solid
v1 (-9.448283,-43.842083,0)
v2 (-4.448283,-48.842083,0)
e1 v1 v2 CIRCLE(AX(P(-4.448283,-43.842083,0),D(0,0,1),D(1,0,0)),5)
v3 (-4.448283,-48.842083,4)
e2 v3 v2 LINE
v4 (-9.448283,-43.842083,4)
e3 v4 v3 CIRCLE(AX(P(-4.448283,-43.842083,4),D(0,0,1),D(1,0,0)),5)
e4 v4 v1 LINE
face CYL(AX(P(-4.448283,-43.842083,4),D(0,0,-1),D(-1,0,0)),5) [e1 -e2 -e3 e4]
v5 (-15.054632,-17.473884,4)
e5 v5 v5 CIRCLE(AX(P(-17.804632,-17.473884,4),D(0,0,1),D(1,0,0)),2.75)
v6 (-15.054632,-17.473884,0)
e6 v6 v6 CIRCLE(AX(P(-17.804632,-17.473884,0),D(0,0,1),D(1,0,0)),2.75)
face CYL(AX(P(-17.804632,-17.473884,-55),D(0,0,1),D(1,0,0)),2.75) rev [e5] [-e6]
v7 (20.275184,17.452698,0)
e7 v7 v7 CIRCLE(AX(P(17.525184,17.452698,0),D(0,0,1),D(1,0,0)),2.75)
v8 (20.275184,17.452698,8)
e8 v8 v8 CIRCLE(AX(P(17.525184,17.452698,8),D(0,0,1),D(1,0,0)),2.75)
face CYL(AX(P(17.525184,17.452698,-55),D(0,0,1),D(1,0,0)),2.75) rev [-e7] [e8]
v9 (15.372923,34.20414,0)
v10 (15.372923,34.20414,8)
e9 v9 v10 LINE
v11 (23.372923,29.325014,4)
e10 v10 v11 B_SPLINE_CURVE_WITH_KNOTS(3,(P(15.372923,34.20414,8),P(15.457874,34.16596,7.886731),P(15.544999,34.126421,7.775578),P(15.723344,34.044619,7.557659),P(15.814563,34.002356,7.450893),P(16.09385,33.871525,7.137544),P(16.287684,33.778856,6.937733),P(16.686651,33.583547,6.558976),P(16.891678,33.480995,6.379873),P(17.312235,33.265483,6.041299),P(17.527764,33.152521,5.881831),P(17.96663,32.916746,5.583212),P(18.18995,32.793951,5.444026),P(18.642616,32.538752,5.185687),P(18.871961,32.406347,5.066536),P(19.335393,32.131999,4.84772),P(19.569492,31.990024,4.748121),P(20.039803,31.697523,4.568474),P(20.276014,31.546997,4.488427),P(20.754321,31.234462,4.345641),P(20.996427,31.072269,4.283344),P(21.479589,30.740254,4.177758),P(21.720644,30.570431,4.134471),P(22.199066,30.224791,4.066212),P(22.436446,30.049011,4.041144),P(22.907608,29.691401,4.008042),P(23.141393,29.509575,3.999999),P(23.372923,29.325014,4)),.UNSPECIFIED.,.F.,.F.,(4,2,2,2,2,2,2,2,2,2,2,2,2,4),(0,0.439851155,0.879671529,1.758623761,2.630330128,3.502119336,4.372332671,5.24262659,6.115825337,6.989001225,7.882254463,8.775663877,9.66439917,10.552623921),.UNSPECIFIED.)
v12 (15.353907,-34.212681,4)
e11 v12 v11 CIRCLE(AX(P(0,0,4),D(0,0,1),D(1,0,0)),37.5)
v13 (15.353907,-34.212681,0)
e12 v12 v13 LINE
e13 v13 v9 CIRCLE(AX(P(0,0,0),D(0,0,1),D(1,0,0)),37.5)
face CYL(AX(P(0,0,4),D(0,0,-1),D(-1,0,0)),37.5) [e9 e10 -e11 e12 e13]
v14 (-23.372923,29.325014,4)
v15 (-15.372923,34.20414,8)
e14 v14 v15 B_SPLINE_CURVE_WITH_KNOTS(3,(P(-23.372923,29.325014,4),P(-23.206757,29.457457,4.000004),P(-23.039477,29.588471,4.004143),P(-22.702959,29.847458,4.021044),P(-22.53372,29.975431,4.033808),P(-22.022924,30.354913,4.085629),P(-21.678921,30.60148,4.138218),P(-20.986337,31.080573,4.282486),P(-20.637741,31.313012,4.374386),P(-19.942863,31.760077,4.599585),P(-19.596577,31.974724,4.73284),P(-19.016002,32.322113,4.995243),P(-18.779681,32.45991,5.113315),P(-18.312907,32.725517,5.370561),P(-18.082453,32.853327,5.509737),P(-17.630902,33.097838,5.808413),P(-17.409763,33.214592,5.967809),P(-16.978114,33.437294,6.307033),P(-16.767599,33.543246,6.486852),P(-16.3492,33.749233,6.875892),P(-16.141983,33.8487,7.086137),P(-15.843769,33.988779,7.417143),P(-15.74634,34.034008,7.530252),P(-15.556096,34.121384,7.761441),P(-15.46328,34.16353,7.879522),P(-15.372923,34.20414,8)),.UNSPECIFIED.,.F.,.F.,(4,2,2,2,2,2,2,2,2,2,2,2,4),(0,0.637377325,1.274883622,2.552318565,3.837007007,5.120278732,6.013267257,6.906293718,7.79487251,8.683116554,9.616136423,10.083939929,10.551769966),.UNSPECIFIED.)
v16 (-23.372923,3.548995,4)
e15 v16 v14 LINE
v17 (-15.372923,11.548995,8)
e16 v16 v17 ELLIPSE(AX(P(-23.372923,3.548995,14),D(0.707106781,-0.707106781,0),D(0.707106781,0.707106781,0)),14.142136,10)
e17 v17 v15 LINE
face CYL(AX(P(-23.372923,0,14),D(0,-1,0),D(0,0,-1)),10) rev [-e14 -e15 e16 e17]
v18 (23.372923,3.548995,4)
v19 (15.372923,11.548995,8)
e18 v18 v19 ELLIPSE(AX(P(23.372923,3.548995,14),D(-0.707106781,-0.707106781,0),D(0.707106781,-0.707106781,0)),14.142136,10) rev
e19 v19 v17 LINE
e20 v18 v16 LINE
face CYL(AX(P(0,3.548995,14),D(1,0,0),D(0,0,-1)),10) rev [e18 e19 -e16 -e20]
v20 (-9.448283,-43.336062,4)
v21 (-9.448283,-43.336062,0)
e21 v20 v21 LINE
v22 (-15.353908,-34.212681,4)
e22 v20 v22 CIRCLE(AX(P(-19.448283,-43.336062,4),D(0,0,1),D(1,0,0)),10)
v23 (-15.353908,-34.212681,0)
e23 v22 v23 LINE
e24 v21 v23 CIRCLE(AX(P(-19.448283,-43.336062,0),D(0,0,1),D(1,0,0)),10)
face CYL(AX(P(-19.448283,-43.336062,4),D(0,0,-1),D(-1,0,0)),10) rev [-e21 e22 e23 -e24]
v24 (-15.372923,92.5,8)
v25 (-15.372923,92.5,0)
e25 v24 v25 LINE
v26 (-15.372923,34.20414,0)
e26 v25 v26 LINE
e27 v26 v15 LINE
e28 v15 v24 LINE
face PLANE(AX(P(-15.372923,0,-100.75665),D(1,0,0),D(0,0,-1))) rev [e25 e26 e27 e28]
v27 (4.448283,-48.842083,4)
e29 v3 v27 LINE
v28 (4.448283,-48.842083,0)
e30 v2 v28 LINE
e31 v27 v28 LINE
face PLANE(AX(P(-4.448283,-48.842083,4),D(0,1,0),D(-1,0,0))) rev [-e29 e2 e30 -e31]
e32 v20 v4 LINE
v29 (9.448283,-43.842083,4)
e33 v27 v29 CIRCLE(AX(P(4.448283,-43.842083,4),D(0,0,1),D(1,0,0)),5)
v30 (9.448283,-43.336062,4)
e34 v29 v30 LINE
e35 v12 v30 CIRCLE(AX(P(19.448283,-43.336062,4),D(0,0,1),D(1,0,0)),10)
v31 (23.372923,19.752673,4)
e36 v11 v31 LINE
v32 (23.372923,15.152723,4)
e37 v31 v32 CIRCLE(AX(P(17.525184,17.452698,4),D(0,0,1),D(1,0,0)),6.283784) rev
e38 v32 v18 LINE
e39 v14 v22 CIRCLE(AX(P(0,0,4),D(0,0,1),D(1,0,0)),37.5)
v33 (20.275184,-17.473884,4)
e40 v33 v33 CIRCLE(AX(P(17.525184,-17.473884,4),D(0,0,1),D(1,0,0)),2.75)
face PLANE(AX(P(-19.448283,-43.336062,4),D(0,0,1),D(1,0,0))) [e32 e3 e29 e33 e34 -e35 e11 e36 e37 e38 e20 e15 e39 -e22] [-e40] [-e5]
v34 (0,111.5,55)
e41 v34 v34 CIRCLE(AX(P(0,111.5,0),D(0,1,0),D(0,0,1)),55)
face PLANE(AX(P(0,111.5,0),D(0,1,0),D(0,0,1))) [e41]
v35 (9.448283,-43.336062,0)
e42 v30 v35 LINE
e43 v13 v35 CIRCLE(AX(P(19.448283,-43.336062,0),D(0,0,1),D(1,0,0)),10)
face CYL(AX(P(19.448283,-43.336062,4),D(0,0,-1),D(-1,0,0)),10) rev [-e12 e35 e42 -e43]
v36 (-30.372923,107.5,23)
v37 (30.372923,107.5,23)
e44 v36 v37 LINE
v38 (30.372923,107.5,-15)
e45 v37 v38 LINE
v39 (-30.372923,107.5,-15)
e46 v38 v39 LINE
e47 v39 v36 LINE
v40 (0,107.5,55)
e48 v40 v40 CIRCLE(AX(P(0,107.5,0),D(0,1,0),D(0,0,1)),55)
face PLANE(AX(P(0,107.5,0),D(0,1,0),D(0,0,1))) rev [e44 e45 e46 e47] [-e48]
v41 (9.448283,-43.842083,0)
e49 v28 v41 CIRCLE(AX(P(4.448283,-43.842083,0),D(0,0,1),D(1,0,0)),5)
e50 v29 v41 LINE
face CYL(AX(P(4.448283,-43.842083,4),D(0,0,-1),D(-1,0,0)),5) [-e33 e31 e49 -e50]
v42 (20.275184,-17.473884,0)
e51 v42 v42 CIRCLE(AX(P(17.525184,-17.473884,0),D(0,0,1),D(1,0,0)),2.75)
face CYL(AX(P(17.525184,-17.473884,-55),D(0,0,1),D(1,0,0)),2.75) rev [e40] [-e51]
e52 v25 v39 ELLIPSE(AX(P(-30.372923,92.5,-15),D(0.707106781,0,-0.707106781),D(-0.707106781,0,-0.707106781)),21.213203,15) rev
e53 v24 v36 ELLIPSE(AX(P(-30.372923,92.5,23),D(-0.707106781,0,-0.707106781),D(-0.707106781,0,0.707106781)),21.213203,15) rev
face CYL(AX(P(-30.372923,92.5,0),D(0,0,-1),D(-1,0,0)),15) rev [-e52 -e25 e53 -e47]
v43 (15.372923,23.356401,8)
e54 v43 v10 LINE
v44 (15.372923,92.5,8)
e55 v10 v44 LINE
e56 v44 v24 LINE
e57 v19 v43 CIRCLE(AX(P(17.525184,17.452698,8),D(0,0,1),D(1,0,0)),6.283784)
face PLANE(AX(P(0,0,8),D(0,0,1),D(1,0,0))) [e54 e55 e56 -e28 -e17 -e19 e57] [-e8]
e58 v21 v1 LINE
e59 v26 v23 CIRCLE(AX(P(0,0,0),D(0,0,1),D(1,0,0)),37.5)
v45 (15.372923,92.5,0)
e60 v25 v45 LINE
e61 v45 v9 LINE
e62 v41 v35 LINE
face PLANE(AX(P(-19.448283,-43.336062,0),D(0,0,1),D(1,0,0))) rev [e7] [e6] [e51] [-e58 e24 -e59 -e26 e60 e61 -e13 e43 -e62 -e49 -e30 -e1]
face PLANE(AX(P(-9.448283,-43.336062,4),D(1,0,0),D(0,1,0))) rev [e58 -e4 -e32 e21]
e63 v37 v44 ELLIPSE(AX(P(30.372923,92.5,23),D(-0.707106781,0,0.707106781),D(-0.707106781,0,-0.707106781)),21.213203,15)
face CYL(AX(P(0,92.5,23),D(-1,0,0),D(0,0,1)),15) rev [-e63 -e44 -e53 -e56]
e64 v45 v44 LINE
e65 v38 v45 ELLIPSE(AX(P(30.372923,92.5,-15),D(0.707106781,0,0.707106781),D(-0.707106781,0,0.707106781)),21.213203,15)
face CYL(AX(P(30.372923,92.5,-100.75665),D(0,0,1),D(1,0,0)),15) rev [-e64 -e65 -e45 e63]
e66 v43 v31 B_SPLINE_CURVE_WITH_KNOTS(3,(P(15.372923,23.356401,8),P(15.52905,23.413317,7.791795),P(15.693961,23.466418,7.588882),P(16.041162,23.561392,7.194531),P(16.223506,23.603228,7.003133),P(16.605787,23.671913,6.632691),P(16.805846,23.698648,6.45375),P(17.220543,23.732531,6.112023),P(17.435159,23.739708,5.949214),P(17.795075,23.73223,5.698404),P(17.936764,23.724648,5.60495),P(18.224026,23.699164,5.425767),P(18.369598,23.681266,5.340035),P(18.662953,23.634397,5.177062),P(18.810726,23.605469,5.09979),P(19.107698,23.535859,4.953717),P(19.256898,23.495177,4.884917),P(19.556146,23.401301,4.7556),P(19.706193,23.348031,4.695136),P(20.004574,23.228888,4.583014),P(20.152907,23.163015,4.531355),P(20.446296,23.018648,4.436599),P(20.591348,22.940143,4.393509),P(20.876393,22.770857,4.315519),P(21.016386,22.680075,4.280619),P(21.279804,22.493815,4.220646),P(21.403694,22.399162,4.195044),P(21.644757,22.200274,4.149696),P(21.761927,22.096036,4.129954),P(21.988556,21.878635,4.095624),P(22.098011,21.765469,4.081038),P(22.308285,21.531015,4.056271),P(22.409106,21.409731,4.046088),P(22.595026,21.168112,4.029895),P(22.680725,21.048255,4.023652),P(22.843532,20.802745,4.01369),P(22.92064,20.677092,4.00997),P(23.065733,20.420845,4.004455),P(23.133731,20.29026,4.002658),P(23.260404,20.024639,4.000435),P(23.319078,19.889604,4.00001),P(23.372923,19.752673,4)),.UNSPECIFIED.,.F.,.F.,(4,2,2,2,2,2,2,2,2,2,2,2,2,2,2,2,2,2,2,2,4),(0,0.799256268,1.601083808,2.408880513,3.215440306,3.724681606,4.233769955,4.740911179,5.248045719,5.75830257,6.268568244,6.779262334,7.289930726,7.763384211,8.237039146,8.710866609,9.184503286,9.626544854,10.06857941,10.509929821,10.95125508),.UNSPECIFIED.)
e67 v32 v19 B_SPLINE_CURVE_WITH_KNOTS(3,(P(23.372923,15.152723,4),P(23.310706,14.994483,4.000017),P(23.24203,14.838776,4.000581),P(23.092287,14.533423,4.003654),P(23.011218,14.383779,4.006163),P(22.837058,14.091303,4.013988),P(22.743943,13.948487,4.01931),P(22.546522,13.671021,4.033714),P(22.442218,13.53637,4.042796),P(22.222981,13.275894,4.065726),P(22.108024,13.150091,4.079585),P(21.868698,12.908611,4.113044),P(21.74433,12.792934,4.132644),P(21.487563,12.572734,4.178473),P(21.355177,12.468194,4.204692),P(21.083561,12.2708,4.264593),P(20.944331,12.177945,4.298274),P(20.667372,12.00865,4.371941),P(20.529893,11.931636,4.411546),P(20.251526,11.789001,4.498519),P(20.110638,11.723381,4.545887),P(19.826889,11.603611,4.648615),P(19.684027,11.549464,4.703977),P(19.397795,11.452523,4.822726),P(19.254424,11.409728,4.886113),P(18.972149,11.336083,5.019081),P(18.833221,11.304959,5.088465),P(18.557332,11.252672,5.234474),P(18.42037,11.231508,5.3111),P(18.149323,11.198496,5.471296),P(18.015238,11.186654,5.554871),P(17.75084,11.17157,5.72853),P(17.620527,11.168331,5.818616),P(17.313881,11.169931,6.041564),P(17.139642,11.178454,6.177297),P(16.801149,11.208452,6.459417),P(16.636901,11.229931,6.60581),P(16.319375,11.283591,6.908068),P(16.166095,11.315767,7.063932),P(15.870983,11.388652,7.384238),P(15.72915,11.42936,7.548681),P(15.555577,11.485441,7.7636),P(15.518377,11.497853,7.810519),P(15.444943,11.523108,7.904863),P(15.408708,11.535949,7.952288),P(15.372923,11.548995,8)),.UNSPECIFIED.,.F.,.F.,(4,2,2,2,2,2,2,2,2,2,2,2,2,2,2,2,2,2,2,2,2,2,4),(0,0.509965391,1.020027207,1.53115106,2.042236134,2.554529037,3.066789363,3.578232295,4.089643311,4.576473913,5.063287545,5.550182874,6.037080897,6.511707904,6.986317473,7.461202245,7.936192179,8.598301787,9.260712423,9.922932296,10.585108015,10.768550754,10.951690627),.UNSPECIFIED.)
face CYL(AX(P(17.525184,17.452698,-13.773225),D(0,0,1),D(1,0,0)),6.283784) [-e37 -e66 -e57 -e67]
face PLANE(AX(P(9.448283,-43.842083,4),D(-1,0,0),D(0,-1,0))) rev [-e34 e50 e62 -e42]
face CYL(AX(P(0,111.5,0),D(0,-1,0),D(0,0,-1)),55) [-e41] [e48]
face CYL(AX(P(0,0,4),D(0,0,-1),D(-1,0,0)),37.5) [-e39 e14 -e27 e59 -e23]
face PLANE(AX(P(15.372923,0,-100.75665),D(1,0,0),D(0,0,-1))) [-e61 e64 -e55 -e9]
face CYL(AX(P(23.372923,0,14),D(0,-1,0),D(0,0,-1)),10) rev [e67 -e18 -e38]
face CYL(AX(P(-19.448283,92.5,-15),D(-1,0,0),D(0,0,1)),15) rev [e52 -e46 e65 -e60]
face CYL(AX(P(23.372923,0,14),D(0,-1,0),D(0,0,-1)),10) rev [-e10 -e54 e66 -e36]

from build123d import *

# Parameters (mm, degrees)
BOSS_EXTRUDE2_DEPTH             = 4
BOSS_EXTRUDE3_DEPTH             = 4
BOSS_EXTRUDE3_DIRECTION_2_REACH = 63.707
FILLET1_R                       = 10
SKETCH4_R                       = 55
BOSS_EXTRUDE4_DEPTH             = 4
FILLET2_R                       = 15
CUT_EXTRUDE1_DEPTH              = 136.949439131
CUT_EXTRUDE1_DEPTH_BACK         = 136.949439131
SKETCH2_4_R                     = 2.75
BOSS_EXTRUDE5_START             = -4
SKETCH5_R                       = 6.283783871
SKETCH5_R_2                     = 2.75
BOSS_EXTRUDE5_DEPTH             = 4


with BuildPart() as part:
    # Sketch2 → Boss-Extrude2 (new body)
    with BuildSketch(Plane.XY):
        with BuildLine():
            Line((-9.448282852, -43.336062282), (-9.448282852, -43.842083491))
            ThreePointArc((-9.448282852, -43.842083491), (-7.983816758, -47.377617397), (-4.448282852, -48.842083491))
            Line((-4.448282852, -48.842083491), (4.448282796, -48.842083491))
            ThreePointArc((4.448282796, -48.842083491), (7.983816702, -47.377617397), (9.448282796, -43.842083491))
            Line((9.448282796, -43.842083491), (9.448282796, -43.336062307))
            ThreePointArc((9.448282796, -43.336062307), (11.053529874, -37.902083712), (15.353907471, -34.212680769))
            ThreePointArc((15.353907471, -34.212680769), (2.4e-08, 37.5), (-15.353907514, -34.212680749))
            ThreePointArc((-15.353907514, -34.212680749), (-11.053529926, -37.902083692), (-9.448282852, -43.336062282))
        make_face()
    extrude(amount=BOSS_EXTRUDE2_DEPTH)

    # Sketch3 → Boss-Extrude3 (add)
    with BuildSketch(Plane.XY.offset(4)):
        with BuildLine():
            Line((-15.37292341, 11.548994525), (15.372923459, 11.548994525))
            Line((15.372923459, 11.548994525), (15.372923459, 34.204140456))
            ThreePointArc((15.372923459, 34.204140456), (2.6e-08, 37.5), (-15.37292341, 34.204140478))
            Line((-15.37292341, 34.204140478), (-15.37292341, 11.548994525))
        make_face()
        with BuildLine():
            ThreePointArc((-15.37292341, 34.204140478), (2.6e-08, 37.5), (15.372923459, 34.204140456))
            Line((15.372923459, 34.204140456), (15.372923459, 107.5))
            Line((15.372923459, 107.5), (-15.37292341, 107.5))
            Line((-15.37292341, 107.5), (-15.37292341, 34.204140478))
        make_face()
    extrude(amount=BOSS_EXTRUDE3_DEPTH)

    # Boss-Extrude3 direction 2: up to this face of the body (flat: up to its plane)
    boss_extrude3_direction_2_end = Plane(part.part.faces().sort_by_distance((-1e-09, -2.077742583, 0))[0])
    # Sketch3 → Boss-Extrude3 direction 2 (add, up to the picked face)
    with BuildSketch(Plane.XY.offset(4), mode=Mode.PRIVATE) as boss_extrude3_direction_2_sk1:
        with BuildLine():
            Line((-15.37292341, 11.548994525), (15.372923459, 11.548994525))
            Line((15.372923459, 11.548994525), (15.372923459, 34.204140456))
            ThreePointArc((15.372923459, 34.204140456), (2.6e-08, 37.5), (-15.37292341, 34.204140478))
            Line((-15.37292341, 34.204140478), (-15.37292341, 11.548994525))
        make_face()
    boss_extrude3_direction_2_tool1 = split(extrude(boss_extrude3_direction_2_sk1.sketch, amount=-BOSS_EXTRUDE3_DIRECTION_2_REACH, mode=Mode.PRIVATE), bisect_by=boss_extrude3_direction_2_end, keep=Keep.BOTH, mode=Mode.PRIVATE)
    # Sketch3 → Boss-Extrude3 direction 2 (add, up to the picked face)
    with BuildSketch(Plane.XY.offset(4), mode=Mode.PRIVATE) as boss_extrude3_direction_2_sk2:
        with BuildLine():
            ThreePointArc((-15.37292341, 34.204140478), (2.6e-08, 37.5), (15.372923459, 34.204140456))
            Line((15.372923459, 34.204140456), (15.372923459, 107.5))
            Line((15.372923459, 107.5), (-15.37292341, 107.5))
            Line((-15.37292341, 107.5), (-15.37292341, 34.204140478))
        make_face()
    boss_extrude3_direction_2_tool2 = split(extrude(boss_extrude3_direction_2_sk2.sketch, amount=-BOSS_EXTRUDE3_DIRECTION_2_REACH, mode=Mode.PRIVATE), bisect_by=boss_extrude3_direction_2_end, keep=Keep.BOTH, mode=Mode.PRIVATE)
    add(boss_extrude3_direction_2_tool1.solids().sort_by(Axis((0, 24.004369, 4), (0, 0, -1)))[0])
    add(boss_extrude3_direction_2_tool2.solids().sort_by(Axis((0, 71.954024, 4), (0, 0, -1)))[0])

    # Fillet1
    # the kernel refuses this fillet: 10 mm, written as the material it adds along each edge
    with BuildSketch(Plane(origin=(-15.37292341, 54.204140478, 4), x_dir=(-1, 0, 0), z_dir=(0, -1, 0))) as fillet1_piece_1_section:
        with BuildLine():
            CenterArc((8, -10), FILLET1_R, 90, 53.130102354)
            Line((0, -4), (-0.16, -3.88))
            ThreePointArc((-0.16, -3.88), (-0.2, -2), (-0.2, 0))
            Line((-0.2, 0), (0, 0.2))
            Line((0, 0.2), (8, 0.2))
            Line((8, 0.2), (8, 0))
        make_face()
    fillet1_piece_1 = extrude(amount=42.655145953, mode=Mode.PRIVATE)
    fillet1_piece_1 = fillet1_piece_1 & Plane(origin=(0, 0, 5.050776903), x_dir=(0.4094375325494367, -0.9123381538332315, 0), z_dir=(0, 0, -1)) * Cylinder(37.5, 118, mode=Mode.PRIVATE)
    add(fillet1_piece_1)
    with BuildSketch(Plane(origin=(-15.37292341, 11.548994525, 4), x_dir=(0, -1, 0), z_dir=(1, 0, 0))) as fillet1_piece_2:
        with BuildLine():
            CenterArc((8, -10), FILLET1_R, 90, 53.130102354)
            Line((0, -4), (-0.16, -3.88))
            ThreePointArc((-0.16, -3.88), (-0.2, -2), (-0.2, 0))
            Line((-0.2, 0), (0, 0.2))
            Line((0, 0.2), (8, 0.2))
            Line((8, 0.2), (8, 0))
        make_face()
    extrude(amount=30.745846869)
    with BuildSketch(Plane(origin=(15.372923459, 54.204140456, 4), x_dir=(1, 0, 0), z_dir=(0, -1, 0))) as fillet1_piece_3_section:
        with BuildLine():
            CenterArc((8, 10), FILLET1_R, 216.869897646, 53.130102354)
            Line((0, 4), (-0.16, 3.88))
            ThreePointArc((-0.16, 3.88), (-0.2, 2), (-0.2, 0))
            Line((-0.2, 0), (0, -0.2))
            Line((0, -0.2), (8, -0.2))
            Line((8, -0.2), (8, 0))
        make_face()
    fillet1_piece_3 = extrude(amount=42.655145931, mode=Mode.PRIVATE)
    fillet1_piece_3 = fillet1_piece_3 & Plane(origin=(0, 0, 5.050777143), x_dir=(0.4094375325494367, -0.9123381538332315, 0), z_dir=(0, 0, -1)) * Cylinder(37.5, 118, mode=Mode.PRIVATE)
    add(fillet1_piece_3)
    with BuildSketch(Plane(origin=(-15.37292341, 54.204140478, 4), x_dir=(-1, 0, 0), z_dir=(0, -1, 0))) as fillet1_piece_4a_section:
        with BuildLine():
            CenterArc((8, -10), FILLET1_R, 90, 53.130102354)
            Line((0, -4), (-0.16, -3.88))
            ThreePointArc((-0.16, -3.88), (-0.2, -2), (-0.2, 0))
            Line((-0.2, 0), (0, 0.2))
            Line((0, 0.2), (8, 0.2))
            Line((8, 0.2), (8, 0))
        make_face()
    fillet1_piece_4a = extrude(amount=62.655145953, mode=Mode.PRIVATE)
    fillet1_piece_4a = split(fillet1_piece_4a, bisect_by=Plane(origin=(-17.431757525, 11.548994525, 5.023885124), z_dir=(0, -1, 0)), keep=Keep.TOP, mode=Mode.PRIVATE)
    with BuildSketch(Plane(origin=(-35.37292341, 11.548994525, 4), x_dir=(0, -1, 0), z_dir=(1, 0, 0))) as fillet1_piece_4b_section:
        with BuildLine():
            CenterArc((8, -10), FILLET1_R, 90, 53.130102354)
            Line((0, -4), (-0.16, -3.88))
            ThreePointArc((-0.16, -3.88), (-0.2, -2), (-0.2, 0))
            Line((-0.2, 0), (0, 0.2))
            Line((0, 0.2), (8, 0.2))
            Line((8, 0.2), (8, 0))
        make_face()
    fillet1_piece_4b = extrude(amount=50.745846869, mode=Mode.PRIVATE)
    fillet1_piece_4b = split(fillet1_piece_4b, bisect_by=Plane(origin=(-15.37292341, 9.490160411, 5.023885124), z_dir=(-1, 0, 0)), keep=Keep.TOP, mode=Mode.PRIVATE)
    fillet1_piece_4 = fillet1_piece_4a & fillet1_piece_4b
    add(fillet1_piece_4)
    with BuildSketch(Plane(origin=(-15.37292341, 11.548994525, 4), x_dir=(0, -1, 0), z_dir=(1, 0, 0))) as fillet1_piece_5a_section:
        with BuildLine():
            CenterArc((8, -10), FILLET1_R, 90, 53.130102354)
            Line((0, -4), (-0.16, -3.88))
            ThreePointArc((-0.16, -3.88), (-0.2, -2), (-0.2, 0))
            Line((-0.2, 0), (0, 0.2))
            Line((0, 0.2), (8, 0.2))
            Line((8, 0.2), (8, 0))
        make_face()
    fillet1_piece_5a = extrude(amount=50.745846869, mode=Mode.PRIVATE)
    fillet1_piece_5a = split(fillet1_piece_5a, bisect_by=Plane(origin=(15.372923459, 9.490160411, 5.023885124), z_dir=(1, 0, 0)), keep=Keep.TOP, mode=Mode.PRIVATE)
    with BuildSketch(Plane(origin=(15.372923459, 54.204140456, 4), x_dir=(1, 0, 0), z_dir=(0, -1, 0))) as fillet1_piece_5b_section:
        with BuildLine():
            CenterArc((8, 10), FILLET1_R, 216.869897646, 53.130102354)
            Line((0, 4), (-0.16, 3.88))
            ThreePointArc((-0.16, 3.88), (-0.2, 2), (-0.2, 0))
            Line((-0.2, 0), (0, -0.2))
            Line((0, -0.2), (8, -0.2))
            Line((8, -0.2), (8, 0))
        make_face()
    fillet1_piece_5b = extrude(amount=62.655145931, mode=Mode.PRIVATE)
    fillet1_piece_5b = split(fillet1_piece_5b, bisect_by=Plane(origin=(17.431757573, 11.548994525, 5.023885124), z_dir=(0, -1, 0)), keep=Keep.TOP, mode=Mode.PRIVATE)
    fillet1_piece_5 = fillet1_piece_5a & fillet1_piece_5b
    add(fillet1_piece_5)

    # Sketch4 → Boss-Extrude4 (add)
    with BuildSketch(Plane(origin=(0, 107.5, 0), x_dir=(1, 0, 0), z_dir=(0, 1, 0))):
        with Locations(Location((0, 0, 0), (0, 0, 270))):
            Circle(SKETCH4_R)
    extrude(amount=BOSS_EXTRUDE4_DEPTH)

    # Fillet2
    fillet2_edges = [part.edges().sort_by_distance(p)[0] for p in [
        (15.372923459, 107.5, 4),
        (-15.37292341, 107.5, 4),
        (2.4e-08, 107.5, 0),
        (2.4e-08, 107.5, 8),
    ]]
    fillet(fillet2_edges, radius=FILLET2_R)

    # Sketch2<4> → Cut-Extrude1 (cut, two sides: drawn at the far end of the back side and taken through both)
    with BuildSketch(Plane.XY.offset(-CUT_EXTRUDE1_DEPTH_BACK)):
        with Locations((17.525184131, 17.452697917)):
            Circle(SKETCH2_4_R)
        with Locations((17.525184131, -17.473883919)):
            Circle(SKETCH2_4_R)
        with Locations((-17.804632122, -17.473883919)):
            Circle(SKETCH2_4_R)
    extrude(amount=CUT_EXTRUDE1_DEPTH + CUT_EXTRUDE1_DEPTH_BACK, mode=Mode.SUBTRACT)

    # Sketch5 → Boss-Extrude5 (add)
    with BuildSketch(Plane.XY.offset(8).offset(BOSS_EXTRUDE5_START)):
        with Locations((17.525184131, 17.452697917)):
            Circle(SKETCH5_R)
        with Locations((17.525184131, 17.452697917)):
            Circle(SKETCH5_R_2, mode=Mode.SUBTRACT)
    extrude(amount=BOSS_EXTRUDE5_DEPTH)


solid = part.part
